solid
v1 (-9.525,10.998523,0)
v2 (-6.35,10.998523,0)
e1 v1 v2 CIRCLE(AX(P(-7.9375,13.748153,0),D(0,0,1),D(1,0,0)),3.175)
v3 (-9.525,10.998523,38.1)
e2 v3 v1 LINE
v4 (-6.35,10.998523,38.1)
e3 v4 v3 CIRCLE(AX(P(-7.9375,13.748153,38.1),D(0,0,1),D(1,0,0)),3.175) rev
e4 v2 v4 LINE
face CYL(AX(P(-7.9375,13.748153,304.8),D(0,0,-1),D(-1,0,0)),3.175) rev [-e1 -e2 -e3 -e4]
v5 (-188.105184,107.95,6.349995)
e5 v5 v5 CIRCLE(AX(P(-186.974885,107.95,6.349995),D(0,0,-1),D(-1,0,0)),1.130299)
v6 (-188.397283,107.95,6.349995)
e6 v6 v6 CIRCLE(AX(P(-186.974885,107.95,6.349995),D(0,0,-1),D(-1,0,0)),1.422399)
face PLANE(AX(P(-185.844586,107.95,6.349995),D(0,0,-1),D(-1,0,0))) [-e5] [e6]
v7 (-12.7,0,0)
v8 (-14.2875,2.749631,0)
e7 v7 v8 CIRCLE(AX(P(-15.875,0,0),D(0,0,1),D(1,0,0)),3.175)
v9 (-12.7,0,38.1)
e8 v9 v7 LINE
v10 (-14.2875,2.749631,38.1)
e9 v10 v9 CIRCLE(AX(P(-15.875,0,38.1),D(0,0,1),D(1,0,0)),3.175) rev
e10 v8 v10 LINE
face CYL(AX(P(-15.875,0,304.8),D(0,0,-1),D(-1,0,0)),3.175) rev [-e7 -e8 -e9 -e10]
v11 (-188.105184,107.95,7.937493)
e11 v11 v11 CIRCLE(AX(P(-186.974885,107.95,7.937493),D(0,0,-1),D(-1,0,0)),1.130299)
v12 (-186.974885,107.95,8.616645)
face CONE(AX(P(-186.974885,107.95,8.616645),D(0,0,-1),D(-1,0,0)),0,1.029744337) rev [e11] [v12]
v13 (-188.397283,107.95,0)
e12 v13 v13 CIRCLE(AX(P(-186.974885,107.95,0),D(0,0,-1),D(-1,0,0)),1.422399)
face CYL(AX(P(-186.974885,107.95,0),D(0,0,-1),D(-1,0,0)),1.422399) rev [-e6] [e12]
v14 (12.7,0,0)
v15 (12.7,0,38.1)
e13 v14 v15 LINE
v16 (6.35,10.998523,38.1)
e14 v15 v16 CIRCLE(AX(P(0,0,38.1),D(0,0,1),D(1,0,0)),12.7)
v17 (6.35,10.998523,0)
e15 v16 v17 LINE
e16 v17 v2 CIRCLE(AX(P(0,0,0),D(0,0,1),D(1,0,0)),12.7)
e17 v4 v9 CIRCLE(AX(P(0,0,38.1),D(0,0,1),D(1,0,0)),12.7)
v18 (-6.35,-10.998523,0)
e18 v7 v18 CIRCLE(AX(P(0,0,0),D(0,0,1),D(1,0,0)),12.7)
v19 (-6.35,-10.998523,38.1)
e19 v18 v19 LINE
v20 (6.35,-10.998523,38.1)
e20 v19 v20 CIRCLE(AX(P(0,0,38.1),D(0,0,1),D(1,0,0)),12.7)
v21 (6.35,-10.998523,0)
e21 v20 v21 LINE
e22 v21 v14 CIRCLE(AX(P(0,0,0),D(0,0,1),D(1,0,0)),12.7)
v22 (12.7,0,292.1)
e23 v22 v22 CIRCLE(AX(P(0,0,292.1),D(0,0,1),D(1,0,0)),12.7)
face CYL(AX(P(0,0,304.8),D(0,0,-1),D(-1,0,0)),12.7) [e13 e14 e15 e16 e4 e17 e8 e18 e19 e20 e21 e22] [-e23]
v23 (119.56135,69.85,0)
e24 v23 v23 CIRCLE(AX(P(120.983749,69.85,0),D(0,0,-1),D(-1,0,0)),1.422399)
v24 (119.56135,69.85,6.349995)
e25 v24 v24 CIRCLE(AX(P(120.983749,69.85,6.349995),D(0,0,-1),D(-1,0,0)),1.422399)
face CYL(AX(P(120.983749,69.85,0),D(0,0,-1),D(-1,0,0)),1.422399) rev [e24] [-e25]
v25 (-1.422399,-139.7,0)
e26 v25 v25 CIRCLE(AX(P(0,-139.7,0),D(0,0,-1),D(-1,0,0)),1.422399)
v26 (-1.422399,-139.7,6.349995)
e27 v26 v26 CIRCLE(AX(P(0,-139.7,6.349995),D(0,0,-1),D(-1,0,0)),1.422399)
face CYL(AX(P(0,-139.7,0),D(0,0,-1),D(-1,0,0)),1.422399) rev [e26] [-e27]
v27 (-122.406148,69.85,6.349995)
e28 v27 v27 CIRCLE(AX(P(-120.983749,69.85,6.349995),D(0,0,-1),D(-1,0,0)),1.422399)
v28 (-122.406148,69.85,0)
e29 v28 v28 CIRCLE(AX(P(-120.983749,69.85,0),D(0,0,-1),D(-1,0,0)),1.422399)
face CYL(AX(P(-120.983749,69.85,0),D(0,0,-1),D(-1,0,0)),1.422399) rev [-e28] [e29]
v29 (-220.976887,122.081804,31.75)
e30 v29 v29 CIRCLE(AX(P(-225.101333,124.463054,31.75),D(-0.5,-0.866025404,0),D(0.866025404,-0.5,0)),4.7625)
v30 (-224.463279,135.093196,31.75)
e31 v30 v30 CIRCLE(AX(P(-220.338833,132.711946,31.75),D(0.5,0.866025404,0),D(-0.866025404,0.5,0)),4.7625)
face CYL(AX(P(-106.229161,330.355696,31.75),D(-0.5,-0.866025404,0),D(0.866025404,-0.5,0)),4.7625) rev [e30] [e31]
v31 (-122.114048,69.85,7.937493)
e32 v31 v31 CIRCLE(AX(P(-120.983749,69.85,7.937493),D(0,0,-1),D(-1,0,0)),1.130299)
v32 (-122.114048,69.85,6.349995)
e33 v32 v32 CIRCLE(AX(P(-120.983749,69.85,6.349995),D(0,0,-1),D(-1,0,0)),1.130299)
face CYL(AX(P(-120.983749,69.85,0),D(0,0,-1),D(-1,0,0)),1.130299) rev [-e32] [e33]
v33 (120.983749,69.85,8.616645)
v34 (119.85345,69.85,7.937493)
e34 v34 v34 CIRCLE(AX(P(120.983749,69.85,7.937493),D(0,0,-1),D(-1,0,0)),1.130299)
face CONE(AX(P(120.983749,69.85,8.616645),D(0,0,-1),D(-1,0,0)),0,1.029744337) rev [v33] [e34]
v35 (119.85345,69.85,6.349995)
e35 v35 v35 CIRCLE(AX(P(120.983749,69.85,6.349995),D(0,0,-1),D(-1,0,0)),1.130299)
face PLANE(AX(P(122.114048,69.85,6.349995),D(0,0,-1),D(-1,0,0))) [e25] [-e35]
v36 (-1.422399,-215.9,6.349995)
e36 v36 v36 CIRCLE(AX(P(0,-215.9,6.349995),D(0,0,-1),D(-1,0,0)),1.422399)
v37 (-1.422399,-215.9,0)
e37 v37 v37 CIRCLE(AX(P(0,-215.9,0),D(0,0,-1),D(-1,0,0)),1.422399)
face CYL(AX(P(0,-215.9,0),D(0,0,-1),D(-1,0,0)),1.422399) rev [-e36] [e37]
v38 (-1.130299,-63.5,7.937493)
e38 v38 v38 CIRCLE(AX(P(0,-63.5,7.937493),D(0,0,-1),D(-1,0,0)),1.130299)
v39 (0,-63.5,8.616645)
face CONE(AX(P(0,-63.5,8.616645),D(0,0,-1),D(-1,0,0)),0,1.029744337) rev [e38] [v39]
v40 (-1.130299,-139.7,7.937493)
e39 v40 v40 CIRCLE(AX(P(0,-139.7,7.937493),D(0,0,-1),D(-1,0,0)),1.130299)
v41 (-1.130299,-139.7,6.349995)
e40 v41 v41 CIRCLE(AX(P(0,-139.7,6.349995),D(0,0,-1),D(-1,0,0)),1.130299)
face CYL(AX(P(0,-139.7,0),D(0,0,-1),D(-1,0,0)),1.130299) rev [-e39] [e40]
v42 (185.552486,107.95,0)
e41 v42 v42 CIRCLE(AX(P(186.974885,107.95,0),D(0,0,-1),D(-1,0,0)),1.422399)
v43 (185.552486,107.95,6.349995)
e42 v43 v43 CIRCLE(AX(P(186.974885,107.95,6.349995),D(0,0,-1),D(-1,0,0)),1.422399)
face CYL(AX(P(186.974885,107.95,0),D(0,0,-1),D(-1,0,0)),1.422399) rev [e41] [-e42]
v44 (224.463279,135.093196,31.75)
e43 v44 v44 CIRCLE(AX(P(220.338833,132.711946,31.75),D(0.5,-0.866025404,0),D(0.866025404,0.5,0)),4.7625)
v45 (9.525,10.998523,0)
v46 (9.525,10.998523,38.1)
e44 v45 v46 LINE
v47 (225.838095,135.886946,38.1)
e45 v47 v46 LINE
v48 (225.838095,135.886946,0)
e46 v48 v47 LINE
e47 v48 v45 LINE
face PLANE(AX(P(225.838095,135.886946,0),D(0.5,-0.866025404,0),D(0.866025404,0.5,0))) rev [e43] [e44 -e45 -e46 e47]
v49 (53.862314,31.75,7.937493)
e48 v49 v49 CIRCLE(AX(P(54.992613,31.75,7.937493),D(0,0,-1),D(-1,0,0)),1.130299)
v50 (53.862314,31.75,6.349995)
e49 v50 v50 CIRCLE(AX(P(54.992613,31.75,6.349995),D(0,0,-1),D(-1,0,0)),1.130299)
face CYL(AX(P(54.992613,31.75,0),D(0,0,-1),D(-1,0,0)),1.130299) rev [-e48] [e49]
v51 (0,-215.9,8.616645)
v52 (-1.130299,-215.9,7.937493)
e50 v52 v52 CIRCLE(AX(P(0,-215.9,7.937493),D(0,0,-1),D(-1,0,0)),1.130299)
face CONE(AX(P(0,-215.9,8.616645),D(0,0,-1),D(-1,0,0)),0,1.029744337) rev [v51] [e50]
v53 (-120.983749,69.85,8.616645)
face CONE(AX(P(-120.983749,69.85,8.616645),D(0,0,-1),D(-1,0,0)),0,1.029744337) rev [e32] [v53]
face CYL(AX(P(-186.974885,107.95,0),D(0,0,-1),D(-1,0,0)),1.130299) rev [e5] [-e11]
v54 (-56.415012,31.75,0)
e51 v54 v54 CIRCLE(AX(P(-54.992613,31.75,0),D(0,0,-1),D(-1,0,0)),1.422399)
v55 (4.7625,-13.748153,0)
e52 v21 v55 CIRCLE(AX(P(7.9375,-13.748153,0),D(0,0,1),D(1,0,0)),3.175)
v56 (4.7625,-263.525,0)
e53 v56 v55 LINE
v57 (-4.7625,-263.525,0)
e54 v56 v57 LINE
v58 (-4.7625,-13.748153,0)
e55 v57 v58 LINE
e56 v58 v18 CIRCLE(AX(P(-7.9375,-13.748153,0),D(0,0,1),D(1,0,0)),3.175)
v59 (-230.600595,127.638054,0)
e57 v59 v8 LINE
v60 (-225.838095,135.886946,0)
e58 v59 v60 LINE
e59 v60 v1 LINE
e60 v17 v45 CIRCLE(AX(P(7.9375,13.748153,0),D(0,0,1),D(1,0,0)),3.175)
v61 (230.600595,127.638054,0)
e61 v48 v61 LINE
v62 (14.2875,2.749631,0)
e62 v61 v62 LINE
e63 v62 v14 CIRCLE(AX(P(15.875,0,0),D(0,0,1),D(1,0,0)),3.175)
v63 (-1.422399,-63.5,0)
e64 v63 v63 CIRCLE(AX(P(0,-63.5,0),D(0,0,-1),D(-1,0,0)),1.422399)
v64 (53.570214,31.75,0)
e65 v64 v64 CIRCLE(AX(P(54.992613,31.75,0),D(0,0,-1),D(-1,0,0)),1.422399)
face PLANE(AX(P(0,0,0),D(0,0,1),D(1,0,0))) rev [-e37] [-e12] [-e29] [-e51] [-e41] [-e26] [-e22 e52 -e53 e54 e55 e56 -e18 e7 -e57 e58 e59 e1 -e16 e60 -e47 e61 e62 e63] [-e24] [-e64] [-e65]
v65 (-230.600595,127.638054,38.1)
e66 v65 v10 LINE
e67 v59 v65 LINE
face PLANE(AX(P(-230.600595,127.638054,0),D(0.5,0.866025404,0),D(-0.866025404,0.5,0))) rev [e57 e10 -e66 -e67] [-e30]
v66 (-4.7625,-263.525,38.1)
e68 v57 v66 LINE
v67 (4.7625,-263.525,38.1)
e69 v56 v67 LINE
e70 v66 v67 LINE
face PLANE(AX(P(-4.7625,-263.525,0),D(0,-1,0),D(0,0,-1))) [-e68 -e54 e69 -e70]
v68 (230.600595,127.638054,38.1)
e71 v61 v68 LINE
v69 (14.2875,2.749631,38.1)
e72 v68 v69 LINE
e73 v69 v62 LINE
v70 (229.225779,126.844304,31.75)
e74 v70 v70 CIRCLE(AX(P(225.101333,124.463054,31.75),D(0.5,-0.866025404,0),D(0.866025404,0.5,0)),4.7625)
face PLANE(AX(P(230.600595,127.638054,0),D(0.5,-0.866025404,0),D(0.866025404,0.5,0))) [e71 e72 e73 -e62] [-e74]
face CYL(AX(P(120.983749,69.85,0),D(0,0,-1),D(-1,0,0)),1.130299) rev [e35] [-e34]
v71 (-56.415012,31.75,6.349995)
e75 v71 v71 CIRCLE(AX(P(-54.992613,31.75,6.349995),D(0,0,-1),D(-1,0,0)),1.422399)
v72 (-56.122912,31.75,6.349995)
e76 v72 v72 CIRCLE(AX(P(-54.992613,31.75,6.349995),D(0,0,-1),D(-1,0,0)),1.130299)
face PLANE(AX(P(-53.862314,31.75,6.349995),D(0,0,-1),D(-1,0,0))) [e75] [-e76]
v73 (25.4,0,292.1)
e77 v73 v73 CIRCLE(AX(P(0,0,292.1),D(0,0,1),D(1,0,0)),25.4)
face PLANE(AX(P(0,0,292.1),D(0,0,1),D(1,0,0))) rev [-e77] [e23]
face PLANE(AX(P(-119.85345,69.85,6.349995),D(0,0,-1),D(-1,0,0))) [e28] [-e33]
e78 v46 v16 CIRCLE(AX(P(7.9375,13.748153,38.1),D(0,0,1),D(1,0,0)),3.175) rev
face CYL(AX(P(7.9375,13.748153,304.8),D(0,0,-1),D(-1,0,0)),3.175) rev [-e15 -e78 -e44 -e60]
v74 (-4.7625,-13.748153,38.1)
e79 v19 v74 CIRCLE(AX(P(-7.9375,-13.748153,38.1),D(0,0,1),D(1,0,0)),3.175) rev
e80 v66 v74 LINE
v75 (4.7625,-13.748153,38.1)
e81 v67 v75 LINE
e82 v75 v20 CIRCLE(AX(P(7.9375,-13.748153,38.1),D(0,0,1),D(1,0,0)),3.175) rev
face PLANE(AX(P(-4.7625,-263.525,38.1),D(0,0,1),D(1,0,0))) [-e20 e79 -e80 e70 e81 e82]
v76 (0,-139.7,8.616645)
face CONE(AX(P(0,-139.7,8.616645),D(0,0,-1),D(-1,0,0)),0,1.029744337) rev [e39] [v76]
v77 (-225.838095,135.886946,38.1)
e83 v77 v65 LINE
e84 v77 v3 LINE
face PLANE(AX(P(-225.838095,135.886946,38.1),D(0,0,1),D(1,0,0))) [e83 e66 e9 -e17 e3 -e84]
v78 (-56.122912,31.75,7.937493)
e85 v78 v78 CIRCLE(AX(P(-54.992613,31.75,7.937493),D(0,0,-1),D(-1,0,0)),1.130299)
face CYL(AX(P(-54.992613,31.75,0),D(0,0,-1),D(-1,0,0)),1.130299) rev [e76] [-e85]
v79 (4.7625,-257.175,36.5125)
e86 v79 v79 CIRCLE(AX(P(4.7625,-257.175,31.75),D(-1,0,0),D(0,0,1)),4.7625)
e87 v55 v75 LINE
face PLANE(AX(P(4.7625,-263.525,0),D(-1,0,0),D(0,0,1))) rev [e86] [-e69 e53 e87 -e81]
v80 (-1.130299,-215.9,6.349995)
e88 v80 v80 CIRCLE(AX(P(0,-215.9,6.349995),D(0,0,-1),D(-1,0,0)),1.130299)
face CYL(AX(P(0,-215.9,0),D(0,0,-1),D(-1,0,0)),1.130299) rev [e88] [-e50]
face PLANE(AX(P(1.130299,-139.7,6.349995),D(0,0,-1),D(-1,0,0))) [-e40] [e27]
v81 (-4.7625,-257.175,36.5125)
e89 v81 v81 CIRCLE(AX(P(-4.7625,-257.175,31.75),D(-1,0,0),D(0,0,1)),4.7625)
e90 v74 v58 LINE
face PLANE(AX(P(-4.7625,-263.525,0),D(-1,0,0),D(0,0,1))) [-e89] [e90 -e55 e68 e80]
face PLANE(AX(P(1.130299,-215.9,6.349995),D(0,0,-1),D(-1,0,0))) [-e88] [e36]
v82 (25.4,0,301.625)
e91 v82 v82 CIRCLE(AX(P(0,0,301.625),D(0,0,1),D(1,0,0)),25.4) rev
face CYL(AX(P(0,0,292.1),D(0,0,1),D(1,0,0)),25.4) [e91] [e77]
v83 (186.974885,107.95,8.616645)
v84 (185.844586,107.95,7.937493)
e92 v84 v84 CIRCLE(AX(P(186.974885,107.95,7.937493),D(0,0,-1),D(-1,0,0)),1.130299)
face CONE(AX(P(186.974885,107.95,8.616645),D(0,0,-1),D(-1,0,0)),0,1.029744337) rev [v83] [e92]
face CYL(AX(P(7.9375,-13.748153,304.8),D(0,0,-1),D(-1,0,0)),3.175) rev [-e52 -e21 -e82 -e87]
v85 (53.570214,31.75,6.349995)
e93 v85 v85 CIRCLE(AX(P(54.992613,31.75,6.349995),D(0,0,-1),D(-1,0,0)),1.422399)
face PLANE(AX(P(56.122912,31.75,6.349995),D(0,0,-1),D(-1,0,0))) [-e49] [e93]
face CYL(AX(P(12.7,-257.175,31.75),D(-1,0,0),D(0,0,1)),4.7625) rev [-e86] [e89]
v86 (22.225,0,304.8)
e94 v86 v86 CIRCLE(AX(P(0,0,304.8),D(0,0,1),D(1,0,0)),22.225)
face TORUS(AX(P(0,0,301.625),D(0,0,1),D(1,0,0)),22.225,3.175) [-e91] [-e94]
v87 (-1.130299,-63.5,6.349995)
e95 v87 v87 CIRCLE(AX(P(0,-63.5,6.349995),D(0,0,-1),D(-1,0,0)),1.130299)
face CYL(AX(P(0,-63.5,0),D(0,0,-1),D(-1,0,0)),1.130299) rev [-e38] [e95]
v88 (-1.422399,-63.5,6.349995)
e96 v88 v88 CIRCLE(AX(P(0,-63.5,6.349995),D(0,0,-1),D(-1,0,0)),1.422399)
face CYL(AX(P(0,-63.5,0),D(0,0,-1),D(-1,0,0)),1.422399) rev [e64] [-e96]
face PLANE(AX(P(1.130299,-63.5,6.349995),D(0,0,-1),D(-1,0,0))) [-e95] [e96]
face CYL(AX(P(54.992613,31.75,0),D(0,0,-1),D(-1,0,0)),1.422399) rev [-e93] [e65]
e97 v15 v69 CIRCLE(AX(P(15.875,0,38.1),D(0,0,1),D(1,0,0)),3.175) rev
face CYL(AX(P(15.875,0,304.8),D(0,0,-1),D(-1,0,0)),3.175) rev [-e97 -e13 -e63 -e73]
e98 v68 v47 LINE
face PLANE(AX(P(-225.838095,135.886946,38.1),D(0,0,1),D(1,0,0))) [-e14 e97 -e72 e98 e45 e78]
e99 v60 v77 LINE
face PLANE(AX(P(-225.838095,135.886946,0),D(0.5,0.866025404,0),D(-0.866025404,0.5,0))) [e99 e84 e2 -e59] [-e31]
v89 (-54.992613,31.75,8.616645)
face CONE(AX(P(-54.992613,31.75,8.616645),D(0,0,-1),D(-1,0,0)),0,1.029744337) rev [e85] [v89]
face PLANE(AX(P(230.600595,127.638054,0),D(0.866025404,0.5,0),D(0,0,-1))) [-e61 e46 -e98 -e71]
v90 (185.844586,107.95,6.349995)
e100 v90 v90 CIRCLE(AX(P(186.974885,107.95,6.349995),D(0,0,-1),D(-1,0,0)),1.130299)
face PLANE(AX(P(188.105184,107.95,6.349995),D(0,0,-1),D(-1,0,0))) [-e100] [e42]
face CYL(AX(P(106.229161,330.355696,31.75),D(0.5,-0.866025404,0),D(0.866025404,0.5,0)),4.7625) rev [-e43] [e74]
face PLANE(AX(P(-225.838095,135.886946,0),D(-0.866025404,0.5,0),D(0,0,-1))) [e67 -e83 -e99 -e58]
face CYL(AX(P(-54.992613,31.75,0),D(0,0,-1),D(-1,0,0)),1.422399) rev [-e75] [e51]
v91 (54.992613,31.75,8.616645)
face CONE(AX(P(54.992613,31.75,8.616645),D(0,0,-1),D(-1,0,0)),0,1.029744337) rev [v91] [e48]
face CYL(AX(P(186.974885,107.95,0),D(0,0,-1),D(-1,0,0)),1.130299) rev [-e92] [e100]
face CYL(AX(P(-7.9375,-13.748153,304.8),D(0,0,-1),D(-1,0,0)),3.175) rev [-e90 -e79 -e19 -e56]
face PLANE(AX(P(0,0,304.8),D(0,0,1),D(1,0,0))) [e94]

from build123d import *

# Parameters (mm, degrees)
SKETCH1_R           = 12.7
BASE_EXTRUDE_DEPTH  = 304.8
SKETCH2_W           = 9.525
SKETCH2_H           = 38.1
BOSS_EXTRUDE1_DEPTH = 263.525
SKETCH3_R           = 4.7625
CUT_EXTRUDE1_DEPTH  = 404.303117433
CIRPATTERN1_COUNT   = 3
SKETCH4_R           = 4.7625
CUT_EXTRUDE2_DEPTH  = 607.93174528
SKETCH5_R           = 4.7625
CUT_EXTRUDE3_DEPTH  = 542.433342309
CIRPATTERN2_COUNT   = 3
FILLET1_R           = 3.175
FILLET2_R           = 3.175
FILLET3_R           = 3.175
SKETCH13_R          = 25.4
EXTRUDE1_DEPTH      = 12.7
FILLET4_R           = 3.175


with BuildPart() as part:
    # Sketch1 → Base-Extrude (new body)
    with BuildSketch(Plane.XY):
        with Locations(Location((0, 0, 0), (0, 0, 180))):
            Circle(SKETCH1_R)
    extrude(amount=BASE_EXTRUDE_DEPTH)

    # Sketch2 → Boss-Extrude1 (add)
    with BuildSketch(Plane(origin=(0, 0, 0), x_dir=(1, 0, 0), z_dir=(0, 1, 0))):
        with Locations((0, -19.05)):
            Rectangle(SKETCH2_W, SKETCH2_H)
    boss_extrude1 = extrude(amount=-BOSS_EXTRUDE1_DEPTH)

    # Sketch3 → Cut-Extrude1 (cut, through all)
    with BuildSketch(Plane.ZY.offset(4.7625)):
        with Locations((31.75, -257.175)):
            Circle(SKETCH3_R)
    extrude(amount=-CUT_EXTRUDE1_DEPTH, mode=Mode.SUBTRACT)

    # CirPattern1: Boss-Extrude1 ×3 about axis
    cirpattern1_axis = Axis((0, 0, 0), (0, 0, 1))
    for i in range(1, CIRPATTERN1_COUNT):
        add(boss_extrude1.rotate(cirpattern1_axis, i * 360 / CIRPATTERN1_COUNT))

    # Sketch4 → Cut-Extrude2 (cut, through all)
    with BuildSketch(Plane(origin=(-194.392750727, 106.733445647, 225.067730564), x_dir=(0.8660254037844363, -0.5000000000000042, 0), z_dir=(-0.5000000000000041, -0.8660254037844362, 0))):
        with Locations((-35.459216735, -193.317730564)):
            Circle(SKETCH4_R)
    extrude(amount=-CUT_EXTRUDE2_DEPTH, mode=Mode.SUBTRACT)

    # Sketch5 → Cut-Extrude3 (cut, through all)
    with BuildSketch(Plane(origin=(132.010089203, 70.716799223, 223.485963444), x_dir=(0.8660254037844434, 0.499999999999992, 0), z_dir=(0.499999999999992, -0.8660254037844434, 0))):
        with Locations((107.492509583, -191.735963444)):
            Circle(SKETCH5_R)
    extrude(amount=-CUT_EXTRUDE3_DEPTH, mode=Mode.SUBTRACT)

    # Sketch8 → Hole1 (revolve, cut)
    with BuildSketch(Plane(origin=(0, -63.5, 0), x_dir=(0, 1, 0), z_dir=(1, 0, 0))):
        Polygon((0, 0), (0, 8.616645174), (1.130299021, 7.937493125), (1.130299021, 6.3499945), (1.422398768, 6.3499945), (1.422398768, 0.002539998), (1.422398768, 0), align=None)
    hole1 = revolve(axis=Axis((0, -63.5, 0), (0, 0, 1)), mode=Mode.SUBTRACT)

    # Sketch10 → Hole2 (revolve, cut)
    with BuildSketch(Plane(origin=(0, -139.7, 0), x_dir=(0, 1, 0), z_dir=(1, 0, 0))):
        Polygon((0, 0), (0, 8.616645174), (1.130299021, 7.937493125), (1.130299021, 6.3499945), (1.422398768, 6.3499945), (1.422398768, 0.002539998), (1.422398768, 0), align=None)
    hole2 = revolve(axis=Axis((0, -139.7, 0), (0, 0, 1)), mode=Mode.SUBTRACT)

    # Sketch12 → Hole3 (revolve, cut)
    with BuildSketch(Plane(origin=(0, -215.9, 0), x_dir=(0, 1, 0), z_dir=(1, 0, 0))):
        Polygon((0, 0), (0, 8.616645174), (1.130299021, 7.937493125), (1.130299021, 6.3499945), (1.422398768, 6.3499945), (1.422398768, 0.002539998), (1.422398768, 0), align=None)
    hole3 = revolve(axis=Axis((0, -215.9, 0), (0, 0, 1)), mode=Mode.SUBTRACT)

    # CirPattern2: Hole1, Hole2, Hole3 ×3 about axis
    cirpattern2_axis = Axis((0, 0, 0), (0, 0, 1))
    add([hole1.rotate(cirpattern2_axis, i * 360 / CIRPATTERN2_COUNT) for i in range(1, CIRPATTERN2_COUNT)], mode=Mode.SUBTRACT)
    add([hole2.rotate(cirpattern2_axis, i * 360 / CIRPATTERN2_COUNT) for i in range(1, CIRPATTERN2_COUNT)], mode=Mode.SUBTRACT)
    add([hole3.rotate(cirpattern2_axis, i * 360 / CIRPATTERN2_COUNT) for i in range(1, CIRPATTERN2_COUNT)], mode=Mode.SUBTRACT)

    # Fillet1
    fillet1_edges = [part.edges().sort_by_distance(p)[0] for p in [
        (-12.577153359, 1.762161564, 19.05),
        (-4.7625, -11.773215098, 19.05),
    ]]
    fillet(fillet1_edges, radius=FILLET1_R - 0.0001)  # a hair under: the kernel refuses the full size

    # Fillet2
    fillet2_edges = [part.edges().sort_by_distance(p)[0] for p in [
        (7.814653359, 10.011053535, 19.05),
        (-7.814653359, 10.011053535, 19.05),
    ]]
    fillet(fillet2_edges, radius=FILLET2_R)

    # Fillet3
    fillet3_edges = [part.edges().sort_by_distance(p)[0] for p in [
        (12.577153359, 1.762161564, 19.05),
        (4.7625, -11.773215098, 19.05),
    ]]
    fillet(fillet3_edges, radius=FILLET3_R)

    # Sketch13 → Extrude1 (add)
    with BuildSketch(Plane.XY.offset(304.8)):
        Circle(SKETCH13_R)
    extrude(amount=-EXTRUDE1_DEPTH)

    # Fillet4
    fillet4_edges = [part.edges().sort_by_distance(p)[0] for p in [
        (-25.4, 0, 304.8),
    ]]
    fillet(fillet4_edges, radius=FILLET4_R)


solid = part.part
